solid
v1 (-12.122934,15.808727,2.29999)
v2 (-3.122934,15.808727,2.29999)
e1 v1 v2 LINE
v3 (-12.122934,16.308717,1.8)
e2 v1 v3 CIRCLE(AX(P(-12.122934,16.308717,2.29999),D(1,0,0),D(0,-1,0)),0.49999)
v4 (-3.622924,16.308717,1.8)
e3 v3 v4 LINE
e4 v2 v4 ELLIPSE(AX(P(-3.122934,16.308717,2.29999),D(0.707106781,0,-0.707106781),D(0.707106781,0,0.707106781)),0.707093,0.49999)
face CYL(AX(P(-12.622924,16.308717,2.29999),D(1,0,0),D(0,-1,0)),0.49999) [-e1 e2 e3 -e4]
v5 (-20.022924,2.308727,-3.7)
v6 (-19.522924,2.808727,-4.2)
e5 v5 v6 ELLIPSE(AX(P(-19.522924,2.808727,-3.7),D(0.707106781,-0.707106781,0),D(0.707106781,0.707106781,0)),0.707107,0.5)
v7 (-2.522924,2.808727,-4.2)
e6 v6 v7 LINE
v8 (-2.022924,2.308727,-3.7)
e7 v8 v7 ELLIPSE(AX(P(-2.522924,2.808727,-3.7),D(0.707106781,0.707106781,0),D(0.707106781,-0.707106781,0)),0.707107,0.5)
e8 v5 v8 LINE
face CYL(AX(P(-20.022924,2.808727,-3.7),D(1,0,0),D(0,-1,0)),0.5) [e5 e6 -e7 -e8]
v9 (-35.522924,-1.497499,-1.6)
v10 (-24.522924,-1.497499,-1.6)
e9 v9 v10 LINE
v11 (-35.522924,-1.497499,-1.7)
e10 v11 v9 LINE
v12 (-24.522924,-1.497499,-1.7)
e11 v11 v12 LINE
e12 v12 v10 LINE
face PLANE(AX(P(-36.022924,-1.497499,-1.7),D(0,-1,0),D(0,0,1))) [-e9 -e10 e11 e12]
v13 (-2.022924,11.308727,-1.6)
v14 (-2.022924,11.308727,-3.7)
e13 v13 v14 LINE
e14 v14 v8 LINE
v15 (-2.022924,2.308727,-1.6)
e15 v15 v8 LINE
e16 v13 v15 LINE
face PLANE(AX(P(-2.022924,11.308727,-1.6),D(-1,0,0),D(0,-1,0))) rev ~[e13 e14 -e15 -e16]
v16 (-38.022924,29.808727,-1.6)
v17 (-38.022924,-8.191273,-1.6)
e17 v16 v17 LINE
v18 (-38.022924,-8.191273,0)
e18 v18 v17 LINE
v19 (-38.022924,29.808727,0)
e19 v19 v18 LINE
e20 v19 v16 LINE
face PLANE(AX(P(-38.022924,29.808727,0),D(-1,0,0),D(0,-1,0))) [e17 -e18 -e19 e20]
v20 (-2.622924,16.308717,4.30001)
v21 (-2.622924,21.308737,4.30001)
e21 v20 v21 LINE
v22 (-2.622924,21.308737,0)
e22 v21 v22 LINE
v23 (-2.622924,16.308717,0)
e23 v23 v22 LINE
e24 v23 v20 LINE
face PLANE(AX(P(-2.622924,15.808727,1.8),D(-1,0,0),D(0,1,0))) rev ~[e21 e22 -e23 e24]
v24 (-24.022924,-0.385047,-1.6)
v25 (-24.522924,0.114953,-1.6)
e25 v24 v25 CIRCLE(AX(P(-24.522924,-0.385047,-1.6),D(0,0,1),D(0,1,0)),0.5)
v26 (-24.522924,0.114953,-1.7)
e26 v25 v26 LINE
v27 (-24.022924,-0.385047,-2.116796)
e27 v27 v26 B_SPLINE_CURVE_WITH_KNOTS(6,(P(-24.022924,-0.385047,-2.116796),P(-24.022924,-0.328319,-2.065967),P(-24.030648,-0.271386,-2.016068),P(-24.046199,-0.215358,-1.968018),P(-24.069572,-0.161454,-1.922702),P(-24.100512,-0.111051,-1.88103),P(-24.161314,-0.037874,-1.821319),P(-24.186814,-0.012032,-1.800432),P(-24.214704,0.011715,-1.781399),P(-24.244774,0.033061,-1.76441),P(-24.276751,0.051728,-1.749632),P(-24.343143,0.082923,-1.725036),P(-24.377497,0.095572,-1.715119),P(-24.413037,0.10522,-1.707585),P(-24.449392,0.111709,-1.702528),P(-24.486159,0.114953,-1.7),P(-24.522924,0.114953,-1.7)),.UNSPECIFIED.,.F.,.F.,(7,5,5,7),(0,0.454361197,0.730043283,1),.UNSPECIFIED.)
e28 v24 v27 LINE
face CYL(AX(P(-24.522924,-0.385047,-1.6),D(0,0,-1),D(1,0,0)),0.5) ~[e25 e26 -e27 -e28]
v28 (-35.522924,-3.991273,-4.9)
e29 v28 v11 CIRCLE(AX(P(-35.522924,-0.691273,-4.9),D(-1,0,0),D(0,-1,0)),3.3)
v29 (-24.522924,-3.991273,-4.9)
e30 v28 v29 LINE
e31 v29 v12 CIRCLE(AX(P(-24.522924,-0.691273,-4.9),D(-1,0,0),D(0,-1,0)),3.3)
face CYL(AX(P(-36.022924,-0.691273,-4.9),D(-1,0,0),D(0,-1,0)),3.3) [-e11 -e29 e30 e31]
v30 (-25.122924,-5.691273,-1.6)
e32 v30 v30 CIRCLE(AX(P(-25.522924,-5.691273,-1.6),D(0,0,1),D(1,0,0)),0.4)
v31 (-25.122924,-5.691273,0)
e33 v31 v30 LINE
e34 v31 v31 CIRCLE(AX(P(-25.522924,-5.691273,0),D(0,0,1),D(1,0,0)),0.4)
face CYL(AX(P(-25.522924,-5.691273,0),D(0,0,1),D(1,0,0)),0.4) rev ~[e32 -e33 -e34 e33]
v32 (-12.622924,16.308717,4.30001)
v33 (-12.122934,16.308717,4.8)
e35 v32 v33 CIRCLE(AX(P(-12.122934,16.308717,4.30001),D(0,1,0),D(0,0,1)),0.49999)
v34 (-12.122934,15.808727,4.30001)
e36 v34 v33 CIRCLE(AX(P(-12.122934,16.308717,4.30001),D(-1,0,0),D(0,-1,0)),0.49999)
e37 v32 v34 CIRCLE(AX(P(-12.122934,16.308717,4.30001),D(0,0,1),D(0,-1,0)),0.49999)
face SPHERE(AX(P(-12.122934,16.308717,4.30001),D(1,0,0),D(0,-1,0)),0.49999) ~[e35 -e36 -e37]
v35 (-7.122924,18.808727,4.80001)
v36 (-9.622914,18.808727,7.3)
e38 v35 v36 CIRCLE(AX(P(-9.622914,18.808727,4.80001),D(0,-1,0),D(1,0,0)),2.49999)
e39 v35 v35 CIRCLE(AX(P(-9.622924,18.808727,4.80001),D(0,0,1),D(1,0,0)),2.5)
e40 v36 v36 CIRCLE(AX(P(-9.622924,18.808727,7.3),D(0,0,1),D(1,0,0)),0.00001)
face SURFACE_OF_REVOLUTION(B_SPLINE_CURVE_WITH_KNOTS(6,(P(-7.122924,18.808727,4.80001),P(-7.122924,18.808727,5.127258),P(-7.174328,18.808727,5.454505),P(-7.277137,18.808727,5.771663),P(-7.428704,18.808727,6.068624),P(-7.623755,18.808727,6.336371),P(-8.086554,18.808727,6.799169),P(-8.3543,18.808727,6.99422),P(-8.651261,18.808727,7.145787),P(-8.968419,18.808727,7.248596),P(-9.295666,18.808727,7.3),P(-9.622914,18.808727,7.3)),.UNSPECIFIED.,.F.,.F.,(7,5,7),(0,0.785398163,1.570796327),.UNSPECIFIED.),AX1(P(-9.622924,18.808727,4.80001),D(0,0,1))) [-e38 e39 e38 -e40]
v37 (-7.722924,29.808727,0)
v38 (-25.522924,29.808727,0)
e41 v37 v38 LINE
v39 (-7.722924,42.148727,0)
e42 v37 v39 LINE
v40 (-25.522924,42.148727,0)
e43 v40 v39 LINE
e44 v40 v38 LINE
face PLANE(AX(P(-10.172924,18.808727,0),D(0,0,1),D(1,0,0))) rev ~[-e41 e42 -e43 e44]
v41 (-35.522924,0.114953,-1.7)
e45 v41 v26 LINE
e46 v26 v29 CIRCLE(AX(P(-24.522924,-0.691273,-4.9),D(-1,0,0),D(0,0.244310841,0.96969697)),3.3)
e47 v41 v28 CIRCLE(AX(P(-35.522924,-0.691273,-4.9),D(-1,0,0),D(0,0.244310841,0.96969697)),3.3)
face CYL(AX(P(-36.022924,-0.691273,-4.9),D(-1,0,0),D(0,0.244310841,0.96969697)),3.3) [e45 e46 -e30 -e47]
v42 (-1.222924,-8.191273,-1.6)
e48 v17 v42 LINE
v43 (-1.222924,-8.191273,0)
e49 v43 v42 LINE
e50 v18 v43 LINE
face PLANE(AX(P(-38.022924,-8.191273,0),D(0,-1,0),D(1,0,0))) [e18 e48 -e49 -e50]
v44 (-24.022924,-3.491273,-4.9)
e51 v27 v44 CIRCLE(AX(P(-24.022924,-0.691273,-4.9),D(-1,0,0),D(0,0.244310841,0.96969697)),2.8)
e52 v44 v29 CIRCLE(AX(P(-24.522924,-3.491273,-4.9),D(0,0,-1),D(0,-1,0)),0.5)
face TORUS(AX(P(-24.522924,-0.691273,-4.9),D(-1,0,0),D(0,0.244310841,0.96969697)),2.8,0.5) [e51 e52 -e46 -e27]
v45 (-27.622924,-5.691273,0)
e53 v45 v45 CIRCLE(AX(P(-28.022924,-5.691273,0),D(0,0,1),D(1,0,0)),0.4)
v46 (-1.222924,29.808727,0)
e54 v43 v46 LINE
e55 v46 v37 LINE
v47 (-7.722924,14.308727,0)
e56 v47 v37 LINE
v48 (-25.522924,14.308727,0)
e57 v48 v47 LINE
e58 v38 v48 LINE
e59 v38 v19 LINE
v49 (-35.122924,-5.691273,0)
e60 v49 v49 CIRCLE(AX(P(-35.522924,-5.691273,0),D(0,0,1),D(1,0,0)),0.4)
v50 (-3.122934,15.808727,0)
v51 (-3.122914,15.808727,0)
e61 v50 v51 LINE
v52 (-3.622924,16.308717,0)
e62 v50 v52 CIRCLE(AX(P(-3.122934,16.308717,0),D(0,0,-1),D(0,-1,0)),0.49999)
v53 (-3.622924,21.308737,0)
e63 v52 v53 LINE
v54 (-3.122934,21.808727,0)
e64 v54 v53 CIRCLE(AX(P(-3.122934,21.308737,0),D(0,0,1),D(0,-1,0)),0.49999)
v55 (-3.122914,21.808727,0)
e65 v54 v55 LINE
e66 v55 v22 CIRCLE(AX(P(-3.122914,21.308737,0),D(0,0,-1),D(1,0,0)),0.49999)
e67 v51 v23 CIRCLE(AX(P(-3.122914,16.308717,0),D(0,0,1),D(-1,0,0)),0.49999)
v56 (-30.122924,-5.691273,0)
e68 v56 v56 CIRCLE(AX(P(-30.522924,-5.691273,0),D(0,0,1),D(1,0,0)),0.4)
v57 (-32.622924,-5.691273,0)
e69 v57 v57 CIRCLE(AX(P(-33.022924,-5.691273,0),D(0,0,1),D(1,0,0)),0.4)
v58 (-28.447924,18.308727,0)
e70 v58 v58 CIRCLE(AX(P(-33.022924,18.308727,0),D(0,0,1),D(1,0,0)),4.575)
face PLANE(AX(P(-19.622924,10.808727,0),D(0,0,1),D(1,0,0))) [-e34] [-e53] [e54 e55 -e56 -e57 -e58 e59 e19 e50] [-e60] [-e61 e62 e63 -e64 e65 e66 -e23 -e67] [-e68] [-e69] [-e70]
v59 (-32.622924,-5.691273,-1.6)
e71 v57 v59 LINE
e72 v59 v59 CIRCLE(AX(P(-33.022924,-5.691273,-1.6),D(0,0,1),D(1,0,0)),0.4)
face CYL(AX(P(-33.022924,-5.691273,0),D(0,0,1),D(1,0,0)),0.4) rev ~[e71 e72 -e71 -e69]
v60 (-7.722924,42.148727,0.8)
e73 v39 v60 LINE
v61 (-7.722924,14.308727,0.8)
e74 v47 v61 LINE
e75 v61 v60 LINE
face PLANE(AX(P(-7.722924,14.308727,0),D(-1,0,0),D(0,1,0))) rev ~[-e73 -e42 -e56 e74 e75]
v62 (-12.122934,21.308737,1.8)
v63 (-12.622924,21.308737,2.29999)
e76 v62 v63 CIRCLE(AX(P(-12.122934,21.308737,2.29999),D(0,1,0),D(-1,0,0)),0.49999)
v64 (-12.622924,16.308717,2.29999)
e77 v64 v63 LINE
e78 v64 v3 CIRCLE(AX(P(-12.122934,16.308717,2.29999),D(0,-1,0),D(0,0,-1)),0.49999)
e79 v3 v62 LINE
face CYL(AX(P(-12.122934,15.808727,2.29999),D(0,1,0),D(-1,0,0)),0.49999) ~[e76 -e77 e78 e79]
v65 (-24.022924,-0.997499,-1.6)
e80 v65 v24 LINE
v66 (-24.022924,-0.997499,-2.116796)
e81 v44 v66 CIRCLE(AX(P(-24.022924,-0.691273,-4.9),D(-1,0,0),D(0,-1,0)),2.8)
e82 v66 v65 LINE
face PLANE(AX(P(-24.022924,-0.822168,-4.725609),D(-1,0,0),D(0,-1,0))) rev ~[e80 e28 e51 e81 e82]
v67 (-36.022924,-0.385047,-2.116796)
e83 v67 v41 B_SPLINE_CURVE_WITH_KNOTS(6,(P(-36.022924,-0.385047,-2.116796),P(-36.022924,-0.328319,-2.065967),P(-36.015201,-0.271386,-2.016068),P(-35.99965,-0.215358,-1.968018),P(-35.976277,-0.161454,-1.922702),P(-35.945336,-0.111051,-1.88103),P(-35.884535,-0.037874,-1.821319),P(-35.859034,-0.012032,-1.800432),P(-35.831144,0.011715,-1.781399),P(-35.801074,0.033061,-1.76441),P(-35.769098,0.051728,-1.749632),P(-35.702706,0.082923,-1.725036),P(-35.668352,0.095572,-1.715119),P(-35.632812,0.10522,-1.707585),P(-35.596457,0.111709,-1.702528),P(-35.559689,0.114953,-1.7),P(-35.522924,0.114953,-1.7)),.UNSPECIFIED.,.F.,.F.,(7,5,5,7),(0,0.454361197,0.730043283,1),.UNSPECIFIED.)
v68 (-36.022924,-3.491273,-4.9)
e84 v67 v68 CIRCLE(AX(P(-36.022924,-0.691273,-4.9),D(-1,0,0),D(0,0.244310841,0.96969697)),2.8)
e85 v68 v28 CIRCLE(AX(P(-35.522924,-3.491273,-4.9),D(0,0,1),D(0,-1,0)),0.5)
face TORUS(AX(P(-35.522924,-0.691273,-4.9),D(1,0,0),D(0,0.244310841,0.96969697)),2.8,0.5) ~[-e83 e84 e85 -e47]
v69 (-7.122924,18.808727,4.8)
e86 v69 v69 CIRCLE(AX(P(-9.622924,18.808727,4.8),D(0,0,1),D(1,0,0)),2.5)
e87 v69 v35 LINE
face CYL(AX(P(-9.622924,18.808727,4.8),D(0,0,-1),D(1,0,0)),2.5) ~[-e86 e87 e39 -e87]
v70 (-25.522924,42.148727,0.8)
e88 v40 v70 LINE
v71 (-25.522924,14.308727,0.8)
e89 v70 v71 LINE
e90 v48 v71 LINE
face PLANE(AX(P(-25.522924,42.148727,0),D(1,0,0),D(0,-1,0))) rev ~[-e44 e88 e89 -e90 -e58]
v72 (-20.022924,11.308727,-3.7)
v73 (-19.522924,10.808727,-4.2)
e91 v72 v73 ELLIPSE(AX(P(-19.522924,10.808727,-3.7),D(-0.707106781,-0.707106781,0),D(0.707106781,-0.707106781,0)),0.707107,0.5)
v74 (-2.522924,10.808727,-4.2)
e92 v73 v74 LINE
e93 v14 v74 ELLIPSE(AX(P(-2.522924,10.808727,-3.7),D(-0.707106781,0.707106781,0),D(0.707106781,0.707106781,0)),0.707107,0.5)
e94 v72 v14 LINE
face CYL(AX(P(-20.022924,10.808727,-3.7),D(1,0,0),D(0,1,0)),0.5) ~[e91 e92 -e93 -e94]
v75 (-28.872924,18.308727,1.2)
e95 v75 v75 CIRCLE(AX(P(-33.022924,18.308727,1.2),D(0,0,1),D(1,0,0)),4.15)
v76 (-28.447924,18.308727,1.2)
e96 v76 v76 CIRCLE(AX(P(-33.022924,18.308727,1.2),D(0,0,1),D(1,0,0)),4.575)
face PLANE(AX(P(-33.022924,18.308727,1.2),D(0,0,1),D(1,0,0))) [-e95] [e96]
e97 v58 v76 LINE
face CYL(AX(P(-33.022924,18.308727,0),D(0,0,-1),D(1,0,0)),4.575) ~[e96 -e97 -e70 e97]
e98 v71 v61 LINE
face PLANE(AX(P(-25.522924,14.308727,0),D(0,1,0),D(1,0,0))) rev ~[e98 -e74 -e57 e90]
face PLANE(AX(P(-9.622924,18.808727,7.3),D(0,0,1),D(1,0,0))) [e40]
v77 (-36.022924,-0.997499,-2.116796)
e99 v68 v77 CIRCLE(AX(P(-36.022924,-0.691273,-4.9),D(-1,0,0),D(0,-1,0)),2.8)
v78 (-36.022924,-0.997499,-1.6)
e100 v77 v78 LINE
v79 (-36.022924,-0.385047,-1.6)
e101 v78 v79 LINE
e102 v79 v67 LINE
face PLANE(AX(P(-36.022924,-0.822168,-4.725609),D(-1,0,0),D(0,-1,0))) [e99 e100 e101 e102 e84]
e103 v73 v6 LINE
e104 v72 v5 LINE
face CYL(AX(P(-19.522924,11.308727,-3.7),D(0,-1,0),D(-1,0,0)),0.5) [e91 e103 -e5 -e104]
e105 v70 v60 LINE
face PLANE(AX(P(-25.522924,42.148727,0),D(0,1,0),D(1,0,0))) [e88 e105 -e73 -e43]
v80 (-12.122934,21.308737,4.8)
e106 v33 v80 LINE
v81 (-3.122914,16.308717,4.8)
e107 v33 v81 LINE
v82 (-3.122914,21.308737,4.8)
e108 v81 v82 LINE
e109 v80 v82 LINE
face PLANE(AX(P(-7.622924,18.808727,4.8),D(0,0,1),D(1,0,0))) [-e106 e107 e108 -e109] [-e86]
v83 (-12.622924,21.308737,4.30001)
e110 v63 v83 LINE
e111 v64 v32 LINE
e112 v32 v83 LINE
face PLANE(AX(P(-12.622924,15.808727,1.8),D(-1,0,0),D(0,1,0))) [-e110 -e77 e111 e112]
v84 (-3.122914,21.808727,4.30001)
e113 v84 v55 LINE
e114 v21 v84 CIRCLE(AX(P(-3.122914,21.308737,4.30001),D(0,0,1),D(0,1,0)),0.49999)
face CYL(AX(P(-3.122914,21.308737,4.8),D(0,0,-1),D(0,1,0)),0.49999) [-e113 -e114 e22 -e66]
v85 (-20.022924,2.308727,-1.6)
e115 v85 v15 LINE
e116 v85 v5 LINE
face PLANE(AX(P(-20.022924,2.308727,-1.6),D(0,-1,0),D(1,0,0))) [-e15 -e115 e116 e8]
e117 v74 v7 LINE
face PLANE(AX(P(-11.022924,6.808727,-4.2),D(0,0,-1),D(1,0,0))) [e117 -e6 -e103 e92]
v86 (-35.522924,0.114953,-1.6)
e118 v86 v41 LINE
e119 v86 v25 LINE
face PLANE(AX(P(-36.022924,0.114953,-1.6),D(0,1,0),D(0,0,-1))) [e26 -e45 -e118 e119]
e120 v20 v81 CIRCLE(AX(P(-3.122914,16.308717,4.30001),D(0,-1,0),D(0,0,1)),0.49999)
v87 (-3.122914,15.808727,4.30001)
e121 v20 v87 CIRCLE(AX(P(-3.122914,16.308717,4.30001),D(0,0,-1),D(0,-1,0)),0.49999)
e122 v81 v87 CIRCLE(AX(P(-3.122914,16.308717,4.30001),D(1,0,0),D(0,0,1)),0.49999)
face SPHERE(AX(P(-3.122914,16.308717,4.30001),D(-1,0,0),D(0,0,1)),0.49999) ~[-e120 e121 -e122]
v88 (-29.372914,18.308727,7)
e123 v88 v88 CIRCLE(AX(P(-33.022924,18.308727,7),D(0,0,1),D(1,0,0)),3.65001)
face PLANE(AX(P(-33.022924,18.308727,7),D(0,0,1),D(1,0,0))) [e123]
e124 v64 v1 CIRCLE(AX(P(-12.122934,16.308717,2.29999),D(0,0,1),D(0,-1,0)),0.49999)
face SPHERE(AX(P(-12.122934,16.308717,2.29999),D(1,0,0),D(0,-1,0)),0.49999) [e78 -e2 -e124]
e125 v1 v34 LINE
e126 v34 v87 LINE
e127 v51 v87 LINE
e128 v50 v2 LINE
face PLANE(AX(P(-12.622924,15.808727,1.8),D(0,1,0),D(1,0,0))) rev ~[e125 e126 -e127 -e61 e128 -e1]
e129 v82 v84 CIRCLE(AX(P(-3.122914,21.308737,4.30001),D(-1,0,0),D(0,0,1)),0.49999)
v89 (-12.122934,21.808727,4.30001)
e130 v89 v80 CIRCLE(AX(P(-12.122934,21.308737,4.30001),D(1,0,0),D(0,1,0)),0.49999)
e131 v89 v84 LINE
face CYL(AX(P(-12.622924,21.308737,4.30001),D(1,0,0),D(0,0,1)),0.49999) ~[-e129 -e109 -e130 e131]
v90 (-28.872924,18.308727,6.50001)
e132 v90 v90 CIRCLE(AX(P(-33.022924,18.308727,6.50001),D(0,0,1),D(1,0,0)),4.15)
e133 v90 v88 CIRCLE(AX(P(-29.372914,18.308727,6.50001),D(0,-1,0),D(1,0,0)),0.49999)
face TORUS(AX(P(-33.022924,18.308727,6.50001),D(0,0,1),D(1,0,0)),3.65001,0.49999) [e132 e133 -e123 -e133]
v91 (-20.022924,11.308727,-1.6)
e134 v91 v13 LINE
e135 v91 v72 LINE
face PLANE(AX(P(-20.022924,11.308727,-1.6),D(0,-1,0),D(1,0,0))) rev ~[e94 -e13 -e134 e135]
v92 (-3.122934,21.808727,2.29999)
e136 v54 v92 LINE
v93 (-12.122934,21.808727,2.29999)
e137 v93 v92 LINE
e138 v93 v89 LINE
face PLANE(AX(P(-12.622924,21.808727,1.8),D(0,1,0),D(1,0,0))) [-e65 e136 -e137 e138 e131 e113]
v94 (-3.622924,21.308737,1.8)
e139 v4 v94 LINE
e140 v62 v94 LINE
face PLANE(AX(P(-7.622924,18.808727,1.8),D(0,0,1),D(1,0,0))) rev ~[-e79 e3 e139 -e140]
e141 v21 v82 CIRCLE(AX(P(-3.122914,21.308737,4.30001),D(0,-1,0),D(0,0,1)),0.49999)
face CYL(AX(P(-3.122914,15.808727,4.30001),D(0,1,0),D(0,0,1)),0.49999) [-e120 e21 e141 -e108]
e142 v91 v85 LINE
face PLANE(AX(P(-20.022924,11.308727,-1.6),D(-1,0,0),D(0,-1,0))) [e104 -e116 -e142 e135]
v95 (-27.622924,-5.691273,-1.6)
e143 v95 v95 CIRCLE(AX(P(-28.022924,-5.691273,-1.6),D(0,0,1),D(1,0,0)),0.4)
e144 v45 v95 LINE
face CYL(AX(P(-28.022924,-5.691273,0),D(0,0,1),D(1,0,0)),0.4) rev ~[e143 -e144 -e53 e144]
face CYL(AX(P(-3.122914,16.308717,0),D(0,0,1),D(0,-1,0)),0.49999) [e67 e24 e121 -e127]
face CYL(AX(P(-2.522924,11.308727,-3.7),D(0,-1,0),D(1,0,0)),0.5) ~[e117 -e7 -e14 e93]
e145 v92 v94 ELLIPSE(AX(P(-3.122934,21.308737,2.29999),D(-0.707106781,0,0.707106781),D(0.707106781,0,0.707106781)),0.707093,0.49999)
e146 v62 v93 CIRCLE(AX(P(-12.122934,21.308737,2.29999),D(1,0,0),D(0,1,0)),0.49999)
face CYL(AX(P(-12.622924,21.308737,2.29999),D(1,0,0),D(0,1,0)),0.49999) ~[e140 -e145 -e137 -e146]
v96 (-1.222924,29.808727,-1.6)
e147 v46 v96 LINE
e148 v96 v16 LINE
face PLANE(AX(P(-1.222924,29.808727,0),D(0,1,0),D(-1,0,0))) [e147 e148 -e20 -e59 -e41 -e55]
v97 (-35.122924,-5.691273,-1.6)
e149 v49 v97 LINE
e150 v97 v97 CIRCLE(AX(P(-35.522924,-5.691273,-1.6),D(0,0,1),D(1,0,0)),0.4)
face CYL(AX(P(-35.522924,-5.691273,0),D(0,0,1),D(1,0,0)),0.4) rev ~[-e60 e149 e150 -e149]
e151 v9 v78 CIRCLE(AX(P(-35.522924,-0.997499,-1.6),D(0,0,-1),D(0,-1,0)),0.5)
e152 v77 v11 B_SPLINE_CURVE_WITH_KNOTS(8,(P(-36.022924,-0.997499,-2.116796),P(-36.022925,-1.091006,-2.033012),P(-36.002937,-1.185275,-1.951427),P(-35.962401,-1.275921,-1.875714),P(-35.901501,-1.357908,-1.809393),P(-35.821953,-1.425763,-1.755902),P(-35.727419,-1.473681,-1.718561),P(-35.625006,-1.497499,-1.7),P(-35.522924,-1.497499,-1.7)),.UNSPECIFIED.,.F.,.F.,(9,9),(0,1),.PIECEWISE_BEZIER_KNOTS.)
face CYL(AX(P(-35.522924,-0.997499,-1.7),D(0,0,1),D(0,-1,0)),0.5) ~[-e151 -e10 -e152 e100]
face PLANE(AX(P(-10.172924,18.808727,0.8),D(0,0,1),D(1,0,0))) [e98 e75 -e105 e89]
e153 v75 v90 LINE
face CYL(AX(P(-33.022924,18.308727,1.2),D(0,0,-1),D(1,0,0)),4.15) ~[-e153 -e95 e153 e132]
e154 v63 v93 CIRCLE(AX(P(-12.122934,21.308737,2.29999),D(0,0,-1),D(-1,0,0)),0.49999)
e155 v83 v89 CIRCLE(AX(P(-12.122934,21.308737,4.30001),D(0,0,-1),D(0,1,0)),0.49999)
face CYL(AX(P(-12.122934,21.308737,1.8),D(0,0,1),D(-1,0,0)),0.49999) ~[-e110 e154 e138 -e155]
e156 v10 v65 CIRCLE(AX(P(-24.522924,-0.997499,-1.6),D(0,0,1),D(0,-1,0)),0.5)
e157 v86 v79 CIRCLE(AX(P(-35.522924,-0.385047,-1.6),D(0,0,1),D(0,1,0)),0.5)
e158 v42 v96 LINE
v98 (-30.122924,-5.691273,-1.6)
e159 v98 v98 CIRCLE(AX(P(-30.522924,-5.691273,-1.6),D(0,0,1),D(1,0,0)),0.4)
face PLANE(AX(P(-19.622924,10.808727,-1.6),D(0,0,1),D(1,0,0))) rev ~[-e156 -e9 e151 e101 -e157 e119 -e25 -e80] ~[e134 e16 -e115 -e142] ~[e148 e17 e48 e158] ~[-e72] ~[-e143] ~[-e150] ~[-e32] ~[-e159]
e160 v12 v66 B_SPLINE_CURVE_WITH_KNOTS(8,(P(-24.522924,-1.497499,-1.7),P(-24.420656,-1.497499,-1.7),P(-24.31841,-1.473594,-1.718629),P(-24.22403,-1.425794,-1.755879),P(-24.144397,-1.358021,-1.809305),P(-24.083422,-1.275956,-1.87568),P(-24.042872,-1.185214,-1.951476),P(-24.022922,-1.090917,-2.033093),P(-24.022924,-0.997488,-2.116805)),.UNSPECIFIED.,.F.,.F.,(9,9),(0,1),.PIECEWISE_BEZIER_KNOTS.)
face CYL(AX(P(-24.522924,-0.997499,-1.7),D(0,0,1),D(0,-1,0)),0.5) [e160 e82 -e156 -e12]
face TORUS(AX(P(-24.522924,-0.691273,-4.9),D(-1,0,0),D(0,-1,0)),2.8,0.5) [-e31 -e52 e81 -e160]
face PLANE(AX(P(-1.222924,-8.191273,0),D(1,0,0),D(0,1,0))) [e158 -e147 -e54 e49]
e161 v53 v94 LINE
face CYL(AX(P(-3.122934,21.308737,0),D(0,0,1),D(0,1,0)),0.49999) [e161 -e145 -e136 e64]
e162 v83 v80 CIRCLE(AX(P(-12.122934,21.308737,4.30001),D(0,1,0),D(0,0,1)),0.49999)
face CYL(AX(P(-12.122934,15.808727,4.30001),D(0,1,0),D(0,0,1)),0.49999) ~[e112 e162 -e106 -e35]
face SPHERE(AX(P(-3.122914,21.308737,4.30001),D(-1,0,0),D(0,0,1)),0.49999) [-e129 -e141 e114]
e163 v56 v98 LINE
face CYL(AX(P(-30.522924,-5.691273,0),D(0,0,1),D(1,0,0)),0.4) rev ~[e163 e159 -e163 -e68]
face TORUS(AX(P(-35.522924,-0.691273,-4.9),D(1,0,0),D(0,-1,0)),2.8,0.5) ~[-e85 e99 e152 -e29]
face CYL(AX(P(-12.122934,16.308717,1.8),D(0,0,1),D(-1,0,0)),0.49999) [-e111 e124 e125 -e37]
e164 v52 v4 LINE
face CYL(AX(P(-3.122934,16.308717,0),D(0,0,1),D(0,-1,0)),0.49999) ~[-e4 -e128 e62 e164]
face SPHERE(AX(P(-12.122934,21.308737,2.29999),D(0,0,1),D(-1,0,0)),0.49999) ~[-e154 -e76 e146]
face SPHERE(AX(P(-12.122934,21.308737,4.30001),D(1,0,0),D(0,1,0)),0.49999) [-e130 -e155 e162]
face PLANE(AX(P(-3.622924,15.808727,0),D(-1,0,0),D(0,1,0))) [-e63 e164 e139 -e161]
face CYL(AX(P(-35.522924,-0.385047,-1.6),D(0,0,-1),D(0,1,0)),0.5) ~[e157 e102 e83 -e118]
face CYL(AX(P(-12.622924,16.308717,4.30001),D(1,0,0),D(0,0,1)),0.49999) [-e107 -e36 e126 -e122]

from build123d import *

# Parameters (mm, degrees)
F0_R      = 4.15
F0_W      = 10
F0_H      = 6
F1_DEPTH  = 1.6
F2_R      = 4.575
F2_R_2    = 4.15
F3_DEPTH  = 1.2
F4_R      = 4.15
F5_DEPTH  = 5.8
F2_W      = 4.9
F2_H      = 6
F2_W_2    = 17.8
F2_H_2    = 12.34
F6_DEPTH  = 0.8
F9_W      = 1
F9_H      = 6
F10_DEPTH = 1.8
F8_W      = 10
F8_H      = 6
F11_DEPTH = 3
F12_R     = 2.5
F13_DEPTH = 2.5
F14_R     = 2.49999
F15_R     = 0.49999
F16_R     = 0.4
F17_DEPTH = 25
F20_DEPTH = 12
F21_R     = 0.5
F22_W     = 18
F22_H     = 9
F23_DEPTH = 2.6
F24_R     = 0.5


# Not quite as in the source:
# - a fillet or chamfer is up to 0.001 mm smaller than in the source, because OpenCascade refuses the exact size


with BuildPart() as f1:
    # F0 (on Top) → F1 (new body)
    with BuildSketch(Plane.XY):
        Polygon((-25.5229242146, 29.8087272195), (-38.0229242146, 29.8087272195), (-38.0229242146, -8.1912727805), (-1.2229242146, -8.1912727805), (-1.2229242146, 29.8087272195), (-7.7229242146, 29.8087272195), align=None)
        with Locations((-33.0229242146, 18.3087272195)):
            Circle(F0_R, mode=Mode.SUBTRACT)
        with Locations((-7.6229242146, 18.8087272195)):
            Rectangle(F0_W, F0_H, mode=Mode.SUBTRACT)
        with Locations((-33.0229242146, 18.3087272195)):
            Circle(F0_R)
        with Locations((-7.6229242146, 18.8087272195)):
            Rectangle(F0_W, F0_H)
    extrude(amount=-F1_DEPTH)

    # F2 (on face) → F3 (join)
    with BuildSketch(Plane.XY):
        with Locations((-33.0229242146, 18.3087272195)):
            Circle(F2_R)
        with Locations((-33.0229242146, 18.3087272195)):
            Circle(F2_R_2, mode=Mode.SUBTRACT)
        with Locations((-33.0229242146, 18.3087272195)):
            Circle(F2_R_2)
    extrude(amount=F3_DEPTH)

    # F4 (on face) → F5 (join)
    with BuildSketch(Plane.XY.offset(1.2)):
        with Locations((-33.0229242146, 18.3087272195)):
            Circle(F4_R)
    extrude(amount=F5_DEPTH)

    # F2 (on face) → F6 (join)
    with BuildSketch(Plane.XY):
        with Locations((-10.1729242146, 18.8087272195)):
            Rectangle(F2_W, F2_H)
        Polygon((-7.7229242146, 15.8087272195), (-12.6229242146, 15.8087272195), (-12.6229242146, 21.8087272195), (-7.7229242146, 21.8087272195), (-7.7229242146, 29.8087272195), (-25.5229242146, 29.8087272195), (-25.5229242146, 14.3087272195), (-7.7229242146, 14.3087272195), align=None)
        with Locations((-16.6229242146, 35.9787272195)):
            Rectangle(F2_W_2, F2_H_2)
    extrude(amount=F6_DEPTH)

    # F9 (on face) → F10 (join)
    with BuildSketch(Plane.XY):
        with Locations((-3.1229242146, 18.8087272195)):
            Rectangle(F9_W, F9_H)
    extrude(amount=F10_DEPTH)

    # F8 (on offset) → F11 (join)
    with BuildSketch(Plane.XY.offset(1.8)):
        with Locations((-7.6229242146, 18.8087272195)):
            Rectangle(F8_W, F8_H)
    extrude(amount=F11_DEPTH)

    # F12 (on face) → F13 (join)
    with BuildSketch(Plane.XY.offset(4.8)):
        with Locations((-9.6229242146, 18.8087272195)):
            Circle(F12_R)
    extrude(amount=F13_DEPTH)

    # F14 (radius 2.5 in the source; OpenCascade refuses exactly that, so slightly less here)
    f14_edges = [f1.edges().sort_by_distance(p)[0] for p in [
        (-12.122924, 18.808727, 7.3),
    ]]
    fillet(f14_edges, radius=F14_R)

    # F15 (radius 0.5 in the source; OpenCascade refuses exactly that, so slightly less here)
    f15_edges = [f1.edges().sort_by_distance(p)[0] for p in [
        (-7.622924, 15.808727, 4.8),
        (-7.622924, 21.808727, 4.8),
        (-2.622924, 18.808727, 4.8),
        (-2.622924, 15.808727, 2.4),
        (-2.622924, 21.808727, 2.4),
        (-3.622924, 15.808727, 0.9),
        (-8.122924, 15.808727, 1.8),
        (-12.622924, 21.808727, 3.3),
        (-12.622924, 15.808727, 3.3),
        (-12.622924, 18.808727, 1.8),
        (-12.622924, 18.808727, 4.8),
        (-8.122924, 21.808727, 1.8),
        (-3.622924, 21.808727, 0.9),
        (-37.172924, 18.308727, 7),
    ]]
    fillet(f15_edges, radius=F15_R)

    # F16 (on face) → F17 (cut)
    with BuildSketch(Plane.XY):
        with Locations((-35.5229242146, -5.6912727805)):
            Circle(F16_R)
        with Locations((-33.0229242146, -5.6912727805)):
            Circle(F16_R)
        with Locations((-30.5229242146, -5.6912727805)):
            Circle(F16_R)
        with Locations((-28.0229242146, -5.6912727805)):
            Circle(F16_R)
        with Locations((-25.5229242146, -5.6912727805)):
            Circle(F16_R)
    extrude(amount=-F17_DEPTH, mode=Mode.SUBTRACT)

    # F19 (on offset) → F20 (join)
    with BuildSketch(Plane(origin=(-36.0229242146, 0, 0), x_dir=(0, -1, 0), z_dir=(-1, 0, 0))):
        with BuildLine():
            ThreePointArc((-0.1149529943, -1.7), (-1.3372063225, -7.5029353677), (3.9912727805, -4.9))
            ThreePointArc((3.9912727805, -4.9), (3.2942081482, -2.8715208969), (1.4974985553, -1.7))
            ThreePointArc((1.4974985553, -1.7), (1.0974747007, -1.6250954212), (0.6912727805, -1.6))
            ThreePointArc((0.6912727805, -1.6), (0.2850708603, -1.6250954212), (-0.1149529943, -1.7))
        make_face()
        with BuildLine():
            ThreePointArc((0.6912727805, -1.6), (1.0974747007, -1.6250954212), (1.4974985553, -1.7))
            Line((1.4974985553, -1.7), (1.4974985553, -1.6))
            Line((1.4974985553, -1.6), (0.6912727805, -1.6))
        make_face()
        with BuildLine():
            Line((-0.1149529943, -1.6), (-0.1149529943, -1.7))
            ThreePointArc((-0.1149529943, -1.7), (0.2850708603, -1.6250954212), (0.6912727805, -1.6))
            Line((0.6912727805, -1.6), (-0.1149529943, -1.6))
        make_face()
    extrude(amount=-F20_DEPTH)

    # F21
    f21_edges = [f1.edges().sort_by_distance(p)[0] for p in [
        (-36.022924, -0.691273, -8.2),
        (-36.022924, 0.114953, -1.65),
        (-36.022924, -1.497499, -1.65),
        (-24.022924, -1.497499, -1.65),
        (-24.022924, 0.114953, -1.65),
        (-24.022924, -0.691273, -8.2),
    ]]
    fillet(f21_edges, radius=F21_R)

    # F22 (on face) → F23 (join)
    with BuildSketch(Plane(origin=(0, 0, -1.6), x_dir=(1, 0, 0), z_dir=(0, 0, -1))):
        with Locations((-11.0229242146, -6.8087272195)):
            Rectangle(F22_W, F22_H)
    extrude(amount=F23_DEPTH)

    # F24
    f24_edges = [f1.edges().sort_by_distance(p)[0] for p in [
        (-11.022924, 2.308727, -4.2),
        (-20.022924, 6.808727, -4.2),
        (-11.022924, 11.308727, -4.2),
        (-2.022924, 6.808727, -4.2),
    ]]
    fillet(f24_edges, radius=F24_R)


solid = f1.part
